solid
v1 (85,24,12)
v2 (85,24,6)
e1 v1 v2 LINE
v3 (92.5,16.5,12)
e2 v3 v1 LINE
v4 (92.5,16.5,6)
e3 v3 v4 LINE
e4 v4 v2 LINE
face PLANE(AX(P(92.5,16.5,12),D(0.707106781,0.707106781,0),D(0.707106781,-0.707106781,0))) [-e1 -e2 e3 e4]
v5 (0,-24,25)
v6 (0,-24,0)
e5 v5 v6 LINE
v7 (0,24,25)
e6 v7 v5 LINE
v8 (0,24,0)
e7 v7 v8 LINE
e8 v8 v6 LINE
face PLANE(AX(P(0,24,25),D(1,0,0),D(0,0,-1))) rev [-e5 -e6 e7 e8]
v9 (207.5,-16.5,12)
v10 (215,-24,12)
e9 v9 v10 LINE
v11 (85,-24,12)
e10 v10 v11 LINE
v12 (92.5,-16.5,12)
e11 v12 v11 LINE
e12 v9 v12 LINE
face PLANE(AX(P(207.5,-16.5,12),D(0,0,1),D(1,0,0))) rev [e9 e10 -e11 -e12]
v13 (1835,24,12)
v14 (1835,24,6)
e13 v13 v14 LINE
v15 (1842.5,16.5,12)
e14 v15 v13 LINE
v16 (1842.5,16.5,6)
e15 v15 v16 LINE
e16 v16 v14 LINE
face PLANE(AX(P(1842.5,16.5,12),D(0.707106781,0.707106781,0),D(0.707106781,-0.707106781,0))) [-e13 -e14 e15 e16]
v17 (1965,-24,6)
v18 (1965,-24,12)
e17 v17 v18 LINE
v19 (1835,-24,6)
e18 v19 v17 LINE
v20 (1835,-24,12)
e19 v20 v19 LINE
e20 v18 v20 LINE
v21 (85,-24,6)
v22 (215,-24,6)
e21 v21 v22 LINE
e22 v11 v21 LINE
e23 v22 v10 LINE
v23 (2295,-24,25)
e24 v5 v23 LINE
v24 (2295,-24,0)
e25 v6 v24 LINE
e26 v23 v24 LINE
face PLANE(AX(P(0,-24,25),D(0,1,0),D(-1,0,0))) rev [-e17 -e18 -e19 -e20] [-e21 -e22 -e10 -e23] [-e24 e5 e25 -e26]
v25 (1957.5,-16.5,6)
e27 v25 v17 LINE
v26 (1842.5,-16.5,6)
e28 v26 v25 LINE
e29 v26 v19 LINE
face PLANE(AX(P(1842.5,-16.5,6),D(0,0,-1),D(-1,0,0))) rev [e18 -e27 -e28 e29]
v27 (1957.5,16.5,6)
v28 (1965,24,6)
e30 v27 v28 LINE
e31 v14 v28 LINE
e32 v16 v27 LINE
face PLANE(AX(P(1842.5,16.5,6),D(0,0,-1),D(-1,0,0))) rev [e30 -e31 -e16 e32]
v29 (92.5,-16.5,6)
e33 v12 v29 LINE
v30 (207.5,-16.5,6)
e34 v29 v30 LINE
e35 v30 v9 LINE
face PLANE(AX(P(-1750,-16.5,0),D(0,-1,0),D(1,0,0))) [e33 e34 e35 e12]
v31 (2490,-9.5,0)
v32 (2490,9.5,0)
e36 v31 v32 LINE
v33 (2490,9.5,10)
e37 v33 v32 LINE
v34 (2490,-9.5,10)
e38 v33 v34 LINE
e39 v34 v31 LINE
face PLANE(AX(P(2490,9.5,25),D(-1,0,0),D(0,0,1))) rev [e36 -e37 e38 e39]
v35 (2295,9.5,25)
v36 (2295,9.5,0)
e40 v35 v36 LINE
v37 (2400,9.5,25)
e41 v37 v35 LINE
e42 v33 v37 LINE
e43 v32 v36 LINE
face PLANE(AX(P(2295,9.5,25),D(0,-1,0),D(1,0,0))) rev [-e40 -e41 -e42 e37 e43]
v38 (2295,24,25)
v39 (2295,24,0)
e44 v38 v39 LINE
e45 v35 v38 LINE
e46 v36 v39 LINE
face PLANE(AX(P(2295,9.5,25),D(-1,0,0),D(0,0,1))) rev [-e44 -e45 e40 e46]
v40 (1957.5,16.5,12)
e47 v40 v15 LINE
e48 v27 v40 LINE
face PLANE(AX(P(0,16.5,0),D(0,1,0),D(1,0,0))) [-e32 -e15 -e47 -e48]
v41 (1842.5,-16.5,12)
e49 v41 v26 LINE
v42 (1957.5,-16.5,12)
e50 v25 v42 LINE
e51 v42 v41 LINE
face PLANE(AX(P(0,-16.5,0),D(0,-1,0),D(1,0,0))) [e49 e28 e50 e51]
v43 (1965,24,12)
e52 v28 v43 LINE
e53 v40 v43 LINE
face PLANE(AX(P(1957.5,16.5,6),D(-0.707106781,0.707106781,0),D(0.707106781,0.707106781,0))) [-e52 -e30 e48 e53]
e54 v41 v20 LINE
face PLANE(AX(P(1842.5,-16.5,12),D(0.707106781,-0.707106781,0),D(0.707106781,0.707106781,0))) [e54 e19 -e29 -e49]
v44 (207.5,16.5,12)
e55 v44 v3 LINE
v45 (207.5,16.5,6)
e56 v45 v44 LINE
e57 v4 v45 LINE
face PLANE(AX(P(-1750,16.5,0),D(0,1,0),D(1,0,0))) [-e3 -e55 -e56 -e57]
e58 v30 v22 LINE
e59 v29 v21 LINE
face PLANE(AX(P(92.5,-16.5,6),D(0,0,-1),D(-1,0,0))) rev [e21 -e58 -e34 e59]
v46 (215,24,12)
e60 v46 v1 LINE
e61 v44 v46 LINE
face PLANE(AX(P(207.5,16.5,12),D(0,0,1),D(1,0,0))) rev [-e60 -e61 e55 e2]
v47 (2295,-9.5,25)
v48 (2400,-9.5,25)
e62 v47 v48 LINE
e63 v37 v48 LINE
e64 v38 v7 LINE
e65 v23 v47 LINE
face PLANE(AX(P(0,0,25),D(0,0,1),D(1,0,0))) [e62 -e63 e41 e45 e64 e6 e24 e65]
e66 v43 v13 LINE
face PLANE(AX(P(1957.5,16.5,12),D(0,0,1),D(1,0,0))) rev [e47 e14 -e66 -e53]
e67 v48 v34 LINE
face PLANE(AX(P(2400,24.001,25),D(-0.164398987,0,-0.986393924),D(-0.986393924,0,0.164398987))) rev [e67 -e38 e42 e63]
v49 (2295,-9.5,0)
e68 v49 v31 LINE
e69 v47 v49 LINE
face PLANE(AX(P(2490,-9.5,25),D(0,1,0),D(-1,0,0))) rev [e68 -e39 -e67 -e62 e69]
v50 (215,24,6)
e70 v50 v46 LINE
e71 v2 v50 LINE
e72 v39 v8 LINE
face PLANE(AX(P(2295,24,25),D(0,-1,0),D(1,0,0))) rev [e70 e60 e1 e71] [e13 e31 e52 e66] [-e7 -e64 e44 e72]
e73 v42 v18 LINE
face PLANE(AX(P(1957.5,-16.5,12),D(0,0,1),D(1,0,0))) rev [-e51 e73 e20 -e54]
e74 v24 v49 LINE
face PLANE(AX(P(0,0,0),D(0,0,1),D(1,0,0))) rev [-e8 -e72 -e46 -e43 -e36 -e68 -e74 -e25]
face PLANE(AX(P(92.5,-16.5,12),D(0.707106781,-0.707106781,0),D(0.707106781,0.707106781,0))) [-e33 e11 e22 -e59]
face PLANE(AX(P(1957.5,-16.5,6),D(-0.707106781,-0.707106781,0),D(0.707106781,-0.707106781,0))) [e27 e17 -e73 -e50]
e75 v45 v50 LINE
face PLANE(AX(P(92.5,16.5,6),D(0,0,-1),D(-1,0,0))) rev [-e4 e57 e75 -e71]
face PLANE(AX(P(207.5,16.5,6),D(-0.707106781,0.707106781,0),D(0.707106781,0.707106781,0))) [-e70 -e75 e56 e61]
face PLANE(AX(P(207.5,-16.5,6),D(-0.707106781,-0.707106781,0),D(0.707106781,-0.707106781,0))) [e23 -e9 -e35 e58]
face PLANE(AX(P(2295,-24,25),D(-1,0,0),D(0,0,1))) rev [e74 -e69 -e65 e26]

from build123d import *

# Parameters (mm, degrees)
EXTRUDE_1_DEPTH        = 25
SKETCH_2_W             = 115
SKETCH_2_H             = 6
CUT_EXTRUDE_1_DEPTH    = 7.5
MIRROR_START           = 6
MIRROR_1_DEPTH         = 6
PATTERN_LINEAR_1_COUNT = 2
PATTERN_LINEAR_1_PITCH = 1750
CUT_EXTRUDE_2_REACH    = 2492.351


# Read off the part's stored shape, not the designer's step: 镜向1
with BuildPart() as part:
    # 草图1 → 凸台-拉伸1 (new body)
    with BuildSketch(Plane.XY):
        Polygon((0, 24), (0, -24), (2295, -24), (2295, -9.5), (2490, -9.5), (2490, 9.5), (2295, 9.5), (2295, 24), align=None)
    extrude(amount=EXTRUDE_1_DEPTH)

    # 草图2 → 切除-拉伸1 (cut)
    with BuildSketch(Plane.XZ.offset(24)):
        with Locations((1900, 9)):
            Rectangle(SKETCH_2_W, SKETCH_2_H)
    cut_extrude_1 = extrude(amount=-CUT_EXTRUDE_1_DEPTH, mode=Mode.SUBTRACT)

    # 镜向1 outline → 镜向1 (cut)
    with BuildSketch(Plane.XY.offset(MIRROR_START)):
        Polygon((1842.5, 16.5), (1957.5, 16.5), (1965, 24), (1835, 24), align=None)
        Polygon((1835, -24), (1842.5, -24), (1842.5, -16.5), align=None)
        Polygon((1965, -24), (1957.5, -16.5), (1957.5, -24), align=None)
    mirror_1 = extrude(amount=MIRROR_1_DEPTH, mode=Mode.SUBTRACT)

    # 阵列(线性)1: 切除-拉伸1, 镜向1 ×2
    with Locations(*[(-i * PATTERN_LINEAR_1_PITCH, 0, 0) for i in range(1, PATTERN_LINEAR_1_COUNT)]):
        add(cut_extrude_1, mode=Mode.SUBTRACT)
        add(mirror_1, mode=Mode.SUBTRACT)

    # 草图3 → 切除-拉伸2 (cut, up to next)
    with BuildSketch(Plane.XZ.offset(9.5), mode=Mode.PRIVATE) as cut_extrude_2_sk1:
        Polygon((2400, 25), (2490, 10), (2490, 25), align=None)
    cut_extrude_2_tool1 = extrude(cut_extrude_2_sk1.sketch, amount=-CUT_EXTRUDE_2_REACH, mode=Mode.PRIVATE) & part.part
    add(cut_extrude_2_tool1.solids().sort_by_distance((2460, -9.5, 20))[0], mode=Mode.SUBTRACT)


solid = part.part
